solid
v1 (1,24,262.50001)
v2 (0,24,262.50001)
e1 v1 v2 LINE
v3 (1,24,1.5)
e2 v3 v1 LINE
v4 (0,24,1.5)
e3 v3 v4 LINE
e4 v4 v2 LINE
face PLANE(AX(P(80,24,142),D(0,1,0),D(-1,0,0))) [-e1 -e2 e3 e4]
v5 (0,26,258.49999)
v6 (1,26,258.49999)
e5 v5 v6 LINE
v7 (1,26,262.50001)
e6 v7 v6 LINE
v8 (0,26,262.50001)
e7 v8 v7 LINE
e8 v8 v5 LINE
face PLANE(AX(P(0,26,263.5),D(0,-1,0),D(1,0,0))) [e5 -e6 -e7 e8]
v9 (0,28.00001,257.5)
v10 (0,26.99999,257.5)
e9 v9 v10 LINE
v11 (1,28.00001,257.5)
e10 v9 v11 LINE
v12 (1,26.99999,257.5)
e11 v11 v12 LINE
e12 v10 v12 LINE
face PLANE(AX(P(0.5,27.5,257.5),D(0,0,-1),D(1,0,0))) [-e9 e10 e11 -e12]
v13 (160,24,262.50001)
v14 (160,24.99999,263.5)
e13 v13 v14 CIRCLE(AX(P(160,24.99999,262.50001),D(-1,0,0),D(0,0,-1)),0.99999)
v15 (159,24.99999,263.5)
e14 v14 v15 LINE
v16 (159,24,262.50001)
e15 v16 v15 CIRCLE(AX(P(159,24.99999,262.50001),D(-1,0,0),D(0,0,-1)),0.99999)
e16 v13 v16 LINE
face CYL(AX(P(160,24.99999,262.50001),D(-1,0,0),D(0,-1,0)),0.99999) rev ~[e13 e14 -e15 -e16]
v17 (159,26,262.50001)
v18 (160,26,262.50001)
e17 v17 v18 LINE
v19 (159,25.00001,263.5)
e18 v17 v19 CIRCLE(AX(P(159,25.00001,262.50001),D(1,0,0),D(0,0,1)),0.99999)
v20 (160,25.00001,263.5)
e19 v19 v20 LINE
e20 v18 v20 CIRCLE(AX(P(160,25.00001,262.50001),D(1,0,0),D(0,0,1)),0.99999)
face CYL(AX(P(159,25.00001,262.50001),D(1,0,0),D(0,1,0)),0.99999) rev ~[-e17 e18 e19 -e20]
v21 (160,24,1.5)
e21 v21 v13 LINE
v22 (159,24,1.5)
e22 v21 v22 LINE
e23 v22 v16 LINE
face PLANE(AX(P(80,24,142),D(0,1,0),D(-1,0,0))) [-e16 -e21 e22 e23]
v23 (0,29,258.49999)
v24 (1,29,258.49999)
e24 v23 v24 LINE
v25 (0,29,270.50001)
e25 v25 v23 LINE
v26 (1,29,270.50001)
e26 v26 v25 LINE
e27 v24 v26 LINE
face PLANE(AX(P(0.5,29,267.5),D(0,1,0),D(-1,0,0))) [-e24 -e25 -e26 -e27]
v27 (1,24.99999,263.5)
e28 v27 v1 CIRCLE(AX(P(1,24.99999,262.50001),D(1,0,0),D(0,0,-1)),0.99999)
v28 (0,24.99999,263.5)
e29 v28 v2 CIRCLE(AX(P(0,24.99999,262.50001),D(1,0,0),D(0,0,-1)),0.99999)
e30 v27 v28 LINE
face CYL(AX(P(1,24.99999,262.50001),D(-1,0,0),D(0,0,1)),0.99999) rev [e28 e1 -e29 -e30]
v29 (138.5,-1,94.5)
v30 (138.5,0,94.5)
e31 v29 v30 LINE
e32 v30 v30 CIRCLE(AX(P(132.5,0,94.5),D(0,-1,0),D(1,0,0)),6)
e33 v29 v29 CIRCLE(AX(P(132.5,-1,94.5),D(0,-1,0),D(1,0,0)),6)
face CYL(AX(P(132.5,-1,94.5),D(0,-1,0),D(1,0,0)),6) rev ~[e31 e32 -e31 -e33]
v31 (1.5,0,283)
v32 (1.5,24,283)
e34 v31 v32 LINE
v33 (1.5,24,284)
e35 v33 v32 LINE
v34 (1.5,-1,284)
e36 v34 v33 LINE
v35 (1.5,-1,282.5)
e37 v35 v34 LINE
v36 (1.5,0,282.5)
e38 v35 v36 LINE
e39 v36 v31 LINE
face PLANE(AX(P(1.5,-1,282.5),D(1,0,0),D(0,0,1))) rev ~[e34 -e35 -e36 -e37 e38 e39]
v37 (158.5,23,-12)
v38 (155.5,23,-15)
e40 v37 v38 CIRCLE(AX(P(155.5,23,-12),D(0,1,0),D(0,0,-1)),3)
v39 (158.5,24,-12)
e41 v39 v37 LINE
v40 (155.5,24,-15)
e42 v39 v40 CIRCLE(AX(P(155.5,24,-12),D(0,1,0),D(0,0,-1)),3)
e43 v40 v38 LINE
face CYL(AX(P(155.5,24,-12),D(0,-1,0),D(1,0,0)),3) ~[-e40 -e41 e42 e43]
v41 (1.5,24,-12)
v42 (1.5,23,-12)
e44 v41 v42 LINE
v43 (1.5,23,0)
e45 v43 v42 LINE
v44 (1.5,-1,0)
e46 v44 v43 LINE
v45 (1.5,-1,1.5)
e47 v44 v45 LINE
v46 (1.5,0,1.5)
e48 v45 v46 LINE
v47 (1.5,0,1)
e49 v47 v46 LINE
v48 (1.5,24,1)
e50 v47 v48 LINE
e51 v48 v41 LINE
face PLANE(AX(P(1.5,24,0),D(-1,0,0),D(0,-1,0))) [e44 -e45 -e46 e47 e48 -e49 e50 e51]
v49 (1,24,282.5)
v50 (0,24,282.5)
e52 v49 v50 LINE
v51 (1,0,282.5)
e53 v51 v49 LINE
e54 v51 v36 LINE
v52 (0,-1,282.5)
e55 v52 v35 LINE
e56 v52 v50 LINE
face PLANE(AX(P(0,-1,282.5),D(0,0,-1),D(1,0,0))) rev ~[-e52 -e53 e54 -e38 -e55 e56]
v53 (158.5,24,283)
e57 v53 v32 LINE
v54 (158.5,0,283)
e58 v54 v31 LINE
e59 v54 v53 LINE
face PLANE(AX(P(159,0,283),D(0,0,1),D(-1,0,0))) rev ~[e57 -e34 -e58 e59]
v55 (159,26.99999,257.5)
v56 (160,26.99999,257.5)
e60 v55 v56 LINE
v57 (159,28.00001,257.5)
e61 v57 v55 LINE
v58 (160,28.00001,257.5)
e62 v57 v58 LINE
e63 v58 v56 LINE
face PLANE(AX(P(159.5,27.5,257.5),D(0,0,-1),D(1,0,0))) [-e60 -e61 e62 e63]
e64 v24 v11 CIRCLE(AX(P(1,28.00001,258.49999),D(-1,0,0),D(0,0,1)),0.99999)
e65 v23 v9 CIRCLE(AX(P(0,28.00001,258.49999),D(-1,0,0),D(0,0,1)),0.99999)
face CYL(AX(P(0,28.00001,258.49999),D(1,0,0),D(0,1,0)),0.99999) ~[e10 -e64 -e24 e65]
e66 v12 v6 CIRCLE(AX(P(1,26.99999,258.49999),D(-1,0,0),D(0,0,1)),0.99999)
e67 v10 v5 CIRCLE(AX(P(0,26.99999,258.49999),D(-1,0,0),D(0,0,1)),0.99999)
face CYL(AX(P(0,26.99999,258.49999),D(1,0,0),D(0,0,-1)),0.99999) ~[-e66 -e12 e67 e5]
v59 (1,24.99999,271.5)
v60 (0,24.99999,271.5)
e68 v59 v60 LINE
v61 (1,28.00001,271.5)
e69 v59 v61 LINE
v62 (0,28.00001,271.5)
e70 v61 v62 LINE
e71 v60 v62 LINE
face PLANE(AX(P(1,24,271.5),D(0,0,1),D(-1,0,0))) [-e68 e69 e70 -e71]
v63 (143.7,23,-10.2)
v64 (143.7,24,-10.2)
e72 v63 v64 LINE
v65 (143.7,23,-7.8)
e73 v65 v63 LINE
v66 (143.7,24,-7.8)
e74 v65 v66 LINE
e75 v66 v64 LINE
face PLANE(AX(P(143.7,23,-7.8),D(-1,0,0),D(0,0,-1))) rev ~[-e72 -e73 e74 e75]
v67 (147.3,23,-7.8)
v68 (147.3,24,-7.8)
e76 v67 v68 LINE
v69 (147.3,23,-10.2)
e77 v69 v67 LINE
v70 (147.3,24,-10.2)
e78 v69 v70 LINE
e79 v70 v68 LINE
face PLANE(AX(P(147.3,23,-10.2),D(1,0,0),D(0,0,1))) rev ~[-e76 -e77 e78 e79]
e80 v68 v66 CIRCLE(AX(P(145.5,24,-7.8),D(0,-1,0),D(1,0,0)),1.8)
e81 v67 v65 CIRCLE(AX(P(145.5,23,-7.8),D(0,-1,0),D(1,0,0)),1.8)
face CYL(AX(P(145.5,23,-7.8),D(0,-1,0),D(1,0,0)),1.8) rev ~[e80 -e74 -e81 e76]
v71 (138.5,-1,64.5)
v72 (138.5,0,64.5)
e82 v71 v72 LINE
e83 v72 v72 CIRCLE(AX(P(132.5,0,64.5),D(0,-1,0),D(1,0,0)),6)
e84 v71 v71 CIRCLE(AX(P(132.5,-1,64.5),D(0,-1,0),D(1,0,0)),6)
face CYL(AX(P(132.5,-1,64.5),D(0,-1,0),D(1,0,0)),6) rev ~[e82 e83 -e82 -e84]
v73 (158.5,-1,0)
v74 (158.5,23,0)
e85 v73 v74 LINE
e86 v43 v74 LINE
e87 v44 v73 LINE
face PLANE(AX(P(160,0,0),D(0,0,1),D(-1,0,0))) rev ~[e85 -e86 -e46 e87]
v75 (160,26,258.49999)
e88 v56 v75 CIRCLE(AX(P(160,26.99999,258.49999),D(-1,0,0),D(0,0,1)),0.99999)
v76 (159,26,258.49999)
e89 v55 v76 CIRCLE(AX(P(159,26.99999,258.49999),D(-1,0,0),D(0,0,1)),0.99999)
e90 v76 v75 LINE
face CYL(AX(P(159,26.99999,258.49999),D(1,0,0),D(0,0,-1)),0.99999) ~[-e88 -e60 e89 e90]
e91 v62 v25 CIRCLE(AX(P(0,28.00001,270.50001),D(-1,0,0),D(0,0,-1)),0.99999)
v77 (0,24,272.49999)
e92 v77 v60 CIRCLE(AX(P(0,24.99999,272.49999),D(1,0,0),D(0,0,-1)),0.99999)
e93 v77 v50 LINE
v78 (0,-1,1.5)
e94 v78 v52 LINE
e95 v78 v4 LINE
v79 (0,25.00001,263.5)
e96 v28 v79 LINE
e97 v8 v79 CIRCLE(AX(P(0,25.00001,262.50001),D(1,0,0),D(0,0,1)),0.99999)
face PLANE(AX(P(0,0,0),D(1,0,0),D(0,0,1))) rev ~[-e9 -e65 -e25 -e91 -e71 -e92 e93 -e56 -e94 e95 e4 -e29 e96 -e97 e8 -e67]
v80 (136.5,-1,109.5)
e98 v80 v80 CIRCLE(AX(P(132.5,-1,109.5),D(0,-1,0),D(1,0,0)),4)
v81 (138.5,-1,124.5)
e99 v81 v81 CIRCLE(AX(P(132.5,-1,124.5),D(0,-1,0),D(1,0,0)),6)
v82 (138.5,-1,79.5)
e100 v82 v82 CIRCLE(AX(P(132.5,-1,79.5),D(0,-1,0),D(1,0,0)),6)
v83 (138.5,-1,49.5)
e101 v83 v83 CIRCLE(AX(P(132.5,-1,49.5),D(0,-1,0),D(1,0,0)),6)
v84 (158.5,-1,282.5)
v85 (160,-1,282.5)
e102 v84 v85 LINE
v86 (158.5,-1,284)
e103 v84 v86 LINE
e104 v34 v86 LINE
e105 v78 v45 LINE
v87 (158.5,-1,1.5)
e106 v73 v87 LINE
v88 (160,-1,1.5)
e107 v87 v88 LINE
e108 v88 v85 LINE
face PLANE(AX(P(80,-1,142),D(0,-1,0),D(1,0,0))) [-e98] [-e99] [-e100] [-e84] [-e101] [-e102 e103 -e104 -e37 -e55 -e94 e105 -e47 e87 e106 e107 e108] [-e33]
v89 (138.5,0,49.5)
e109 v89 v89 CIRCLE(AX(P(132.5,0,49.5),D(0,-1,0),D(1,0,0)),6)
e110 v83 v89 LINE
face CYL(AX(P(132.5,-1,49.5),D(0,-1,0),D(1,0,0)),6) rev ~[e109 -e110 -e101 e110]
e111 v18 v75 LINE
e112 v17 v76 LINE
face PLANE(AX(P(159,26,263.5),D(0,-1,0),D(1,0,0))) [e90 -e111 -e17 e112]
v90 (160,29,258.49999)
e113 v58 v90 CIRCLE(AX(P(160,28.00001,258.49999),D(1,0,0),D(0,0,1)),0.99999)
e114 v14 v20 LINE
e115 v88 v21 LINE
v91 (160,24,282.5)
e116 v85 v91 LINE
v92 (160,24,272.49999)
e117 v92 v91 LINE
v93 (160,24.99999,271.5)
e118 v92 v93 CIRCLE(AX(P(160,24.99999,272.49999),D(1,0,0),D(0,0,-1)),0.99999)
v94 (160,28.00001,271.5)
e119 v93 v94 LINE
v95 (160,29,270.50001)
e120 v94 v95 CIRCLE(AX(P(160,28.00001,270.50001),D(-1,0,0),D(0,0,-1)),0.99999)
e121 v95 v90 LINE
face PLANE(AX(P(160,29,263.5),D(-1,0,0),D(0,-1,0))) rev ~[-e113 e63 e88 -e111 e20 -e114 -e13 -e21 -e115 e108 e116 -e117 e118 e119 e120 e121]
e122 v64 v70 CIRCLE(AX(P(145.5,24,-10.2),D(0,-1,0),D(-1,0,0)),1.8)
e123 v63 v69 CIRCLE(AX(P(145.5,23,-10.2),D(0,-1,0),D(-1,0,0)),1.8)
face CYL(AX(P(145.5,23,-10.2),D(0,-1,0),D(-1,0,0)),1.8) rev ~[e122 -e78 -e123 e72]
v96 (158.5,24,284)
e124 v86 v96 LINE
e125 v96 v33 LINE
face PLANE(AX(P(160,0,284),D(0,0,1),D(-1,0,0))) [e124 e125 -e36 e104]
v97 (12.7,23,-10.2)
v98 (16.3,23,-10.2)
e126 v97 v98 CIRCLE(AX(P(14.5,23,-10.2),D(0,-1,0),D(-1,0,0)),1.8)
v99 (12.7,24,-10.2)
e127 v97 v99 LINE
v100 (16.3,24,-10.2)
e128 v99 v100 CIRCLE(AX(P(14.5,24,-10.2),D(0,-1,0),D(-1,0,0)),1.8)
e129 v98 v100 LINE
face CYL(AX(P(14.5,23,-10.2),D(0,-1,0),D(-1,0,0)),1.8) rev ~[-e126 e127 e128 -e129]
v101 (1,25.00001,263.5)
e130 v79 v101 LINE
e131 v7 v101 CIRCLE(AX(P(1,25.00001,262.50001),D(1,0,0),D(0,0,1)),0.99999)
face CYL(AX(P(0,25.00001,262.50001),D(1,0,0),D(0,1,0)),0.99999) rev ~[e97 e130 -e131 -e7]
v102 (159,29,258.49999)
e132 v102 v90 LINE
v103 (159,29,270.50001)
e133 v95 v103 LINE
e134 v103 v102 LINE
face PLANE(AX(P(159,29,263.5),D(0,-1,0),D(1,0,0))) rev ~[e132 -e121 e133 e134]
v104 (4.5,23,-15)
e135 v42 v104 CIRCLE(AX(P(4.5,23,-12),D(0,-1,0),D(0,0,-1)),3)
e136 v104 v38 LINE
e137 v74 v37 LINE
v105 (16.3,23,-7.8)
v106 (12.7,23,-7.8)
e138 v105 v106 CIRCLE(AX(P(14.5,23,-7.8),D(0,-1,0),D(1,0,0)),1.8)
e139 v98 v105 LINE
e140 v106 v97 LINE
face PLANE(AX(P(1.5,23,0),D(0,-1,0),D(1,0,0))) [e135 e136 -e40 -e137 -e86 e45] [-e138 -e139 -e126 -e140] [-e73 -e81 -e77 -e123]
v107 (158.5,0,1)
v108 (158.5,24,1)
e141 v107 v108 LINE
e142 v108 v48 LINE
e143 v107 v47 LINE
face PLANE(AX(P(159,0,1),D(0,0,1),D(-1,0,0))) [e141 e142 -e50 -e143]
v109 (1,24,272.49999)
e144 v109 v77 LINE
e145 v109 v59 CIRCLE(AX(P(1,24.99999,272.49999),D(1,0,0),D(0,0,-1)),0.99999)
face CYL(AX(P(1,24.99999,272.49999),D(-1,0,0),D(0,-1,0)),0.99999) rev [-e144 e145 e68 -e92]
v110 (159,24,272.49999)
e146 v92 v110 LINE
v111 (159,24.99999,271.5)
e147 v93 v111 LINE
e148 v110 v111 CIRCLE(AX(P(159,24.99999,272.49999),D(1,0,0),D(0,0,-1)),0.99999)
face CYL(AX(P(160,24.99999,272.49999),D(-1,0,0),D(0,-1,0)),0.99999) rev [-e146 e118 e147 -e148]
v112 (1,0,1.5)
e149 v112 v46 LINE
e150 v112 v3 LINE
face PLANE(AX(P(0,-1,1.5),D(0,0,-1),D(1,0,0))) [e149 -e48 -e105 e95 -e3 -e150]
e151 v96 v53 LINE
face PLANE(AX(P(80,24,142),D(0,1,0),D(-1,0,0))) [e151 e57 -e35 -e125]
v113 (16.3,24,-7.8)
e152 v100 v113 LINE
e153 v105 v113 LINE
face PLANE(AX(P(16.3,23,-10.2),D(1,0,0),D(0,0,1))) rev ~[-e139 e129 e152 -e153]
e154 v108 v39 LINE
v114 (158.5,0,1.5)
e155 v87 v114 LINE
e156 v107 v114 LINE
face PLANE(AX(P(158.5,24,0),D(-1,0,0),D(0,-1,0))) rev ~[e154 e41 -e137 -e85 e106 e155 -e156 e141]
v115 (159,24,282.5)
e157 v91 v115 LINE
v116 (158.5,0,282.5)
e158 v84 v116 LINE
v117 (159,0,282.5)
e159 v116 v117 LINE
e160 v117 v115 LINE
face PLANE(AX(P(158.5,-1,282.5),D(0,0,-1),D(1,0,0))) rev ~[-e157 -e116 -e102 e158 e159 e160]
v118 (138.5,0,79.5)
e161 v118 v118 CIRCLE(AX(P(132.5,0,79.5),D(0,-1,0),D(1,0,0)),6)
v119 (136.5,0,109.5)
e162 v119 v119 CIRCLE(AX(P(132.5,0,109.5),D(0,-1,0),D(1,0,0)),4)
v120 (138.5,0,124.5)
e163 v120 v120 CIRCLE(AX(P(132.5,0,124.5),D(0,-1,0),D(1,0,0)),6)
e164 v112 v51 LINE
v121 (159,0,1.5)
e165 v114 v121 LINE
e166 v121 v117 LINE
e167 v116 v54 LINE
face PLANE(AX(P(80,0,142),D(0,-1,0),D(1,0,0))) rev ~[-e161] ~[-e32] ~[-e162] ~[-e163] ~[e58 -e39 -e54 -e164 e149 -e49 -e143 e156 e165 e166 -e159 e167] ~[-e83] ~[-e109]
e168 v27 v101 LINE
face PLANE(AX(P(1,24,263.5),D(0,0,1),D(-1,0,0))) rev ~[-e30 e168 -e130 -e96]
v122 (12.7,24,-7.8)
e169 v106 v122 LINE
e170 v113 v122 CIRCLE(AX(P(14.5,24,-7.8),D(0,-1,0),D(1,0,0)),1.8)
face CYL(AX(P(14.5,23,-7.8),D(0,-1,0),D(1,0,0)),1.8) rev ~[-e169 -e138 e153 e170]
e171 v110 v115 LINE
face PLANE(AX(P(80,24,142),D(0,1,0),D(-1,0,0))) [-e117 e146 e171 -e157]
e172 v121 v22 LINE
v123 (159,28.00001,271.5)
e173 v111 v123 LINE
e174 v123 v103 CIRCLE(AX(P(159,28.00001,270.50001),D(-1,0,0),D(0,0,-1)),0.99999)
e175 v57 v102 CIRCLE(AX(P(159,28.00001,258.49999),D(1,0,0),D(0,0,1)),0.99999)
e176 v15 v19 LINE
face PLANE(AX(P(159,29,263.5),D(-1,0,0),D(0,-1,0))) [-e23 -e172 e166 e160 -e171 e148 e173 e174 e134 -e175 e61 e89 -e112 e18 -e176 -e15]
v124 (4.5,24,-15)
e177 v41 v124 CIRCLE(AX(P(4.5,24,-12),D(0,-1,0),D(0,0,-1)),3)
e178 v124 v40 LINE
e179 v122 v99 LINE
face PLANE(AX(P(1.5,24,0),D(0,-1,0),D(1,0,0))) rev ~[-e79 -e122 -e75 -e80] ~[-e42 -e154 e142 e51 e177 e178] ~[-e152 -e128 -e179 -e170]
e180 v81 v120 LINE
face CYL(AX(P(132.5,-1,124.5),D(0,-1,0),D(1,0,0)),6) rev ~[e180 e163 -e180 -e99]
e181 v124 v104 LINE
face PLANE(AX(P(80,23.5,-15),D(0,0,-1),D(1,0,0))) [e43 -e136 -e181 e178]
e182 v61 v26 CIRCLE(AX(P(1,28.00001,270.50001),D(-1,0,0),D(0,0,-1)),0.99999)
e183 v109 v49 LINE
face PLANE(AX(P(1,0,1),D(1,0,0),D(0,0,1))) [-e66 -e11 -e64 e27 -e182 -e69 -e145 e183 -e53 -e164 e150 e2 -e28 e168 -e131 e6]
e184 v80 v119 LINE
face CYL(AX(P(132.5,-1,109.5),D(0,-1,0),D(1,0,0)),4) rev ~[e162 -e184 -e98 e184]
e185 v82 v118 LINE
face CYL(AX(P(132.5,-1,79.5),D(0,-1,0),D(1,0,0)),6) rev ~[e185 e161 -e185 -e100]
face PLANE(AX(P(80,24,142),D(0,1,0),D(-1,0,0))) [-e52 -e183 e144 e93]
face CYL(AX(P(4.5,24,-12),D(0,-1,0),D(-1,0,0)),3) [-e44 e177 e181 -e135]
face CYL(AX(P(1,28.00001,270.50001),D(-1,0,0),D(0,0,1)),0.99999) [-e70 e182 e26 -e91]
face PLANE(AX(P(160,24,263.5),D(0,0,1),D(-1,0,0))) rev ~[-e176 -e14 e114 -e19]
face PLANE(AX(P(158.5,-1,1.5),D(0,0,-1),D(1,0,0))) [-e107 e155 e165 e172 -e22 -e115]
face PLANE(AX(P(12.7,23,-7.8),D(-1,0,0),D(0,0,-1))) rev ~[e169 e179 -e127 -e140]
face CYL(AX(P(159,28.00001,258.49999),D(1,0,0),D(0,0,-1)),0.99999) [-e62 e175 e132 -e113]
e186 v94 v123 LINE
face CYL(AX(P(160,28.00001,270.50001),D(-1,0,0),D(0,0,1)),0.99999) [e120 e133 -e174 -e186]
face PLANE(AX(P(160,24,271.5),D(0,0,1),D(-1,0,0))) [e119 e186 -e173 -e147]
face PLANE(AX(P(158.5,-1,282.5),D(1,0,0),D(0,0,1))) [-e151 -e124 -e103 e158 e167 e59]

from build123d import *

# Parameters (mm, degrees)
F0_W      = 160
F0_H      = 284
F1_DEPTH  = 1
F2_W      = 160
F2_H      = 284
F2_W_2    = 158
F2_H_2    = 282
F3_DEPTH  = 24
F4_W      = 1.5
F4_H      = 1.5
F5_DEPTH  = 25.001
F6_R      = 6
F6_R_2    = 4
F7_DEPTH  = 25.001
F8_W      = 157
F8_H      = 1
F9_DEPTH  = 15
F10_R     = 3
F12_DEPTH = 1.001
F13_W     = 1
F13_H     = 8
F14_DEPTH = 5
F15_W     = 1
F15_H     = 3
F16_DEPTH = 6
F17_R     = 0.99999
F18_R     = 0.99999


# Not quite as in the source:
# - a fillet or chamfer is up to 0.001 mm smaller than in the source, because OpenCascade refuses the exact size


with BuildPart() as f1:
    # F0 (on Front) → F1 (new body)
    with BuildSketch(Plane.XZ):
        with Locations((80, 142)):
            Rectangle(F0_W, F0_H)
    extrude(amount=F1_DEPTH)

    # F2 (on face) → F3 (join)
    with BuildSketch(Plane(origin=(0, 0, 0), x_dir=(-1, 0, 0), z_dir=(0, 1, 0))):
        with Locations((-80, 142)):
            Rectangle(F2_W, F2_H)
        with Locations((-80, 142)):
            Rectangle(F2_W_2, F2_H_2, mode=Mode.SUBTRACT)
    extrude(amount=F3_DEPTH)

    # F4 (on face) → F5 (cut, through all)
    with BuildSketch(Plane.XZ.offset(1)):
        with Locations((0.75, 283.25)):
            Rectangle(F4_W, F4_H)
        with Locations((159.25, 283.25)):
            Rectangle(F4_W, F4_H)
        with Locations((159.25, 0.75)):
            Rectangle(F4_W, F4_H)
        with Locations((0.75, 0.75)):
            Rectangle(F4_W, F4_H)
    extrude(amount=-F5_DEPTH, mode=Mode.SUBTRACT)

    # F6 (on face) → F7 (cut, through all)
    with BuildSketch(Plane.XZ.offset(1)):
        with Locations((132.5, 124.5)):
            Circle(F6_R)
        with Locations((132.5, 109.5)):
            Circle(F6_R_2)
        with Locations((132.5, 94.5)):
            Circle(F6_R)
        with Locations((132.5, 79.5)):
            Circle(F6_R)
        with Locations((132.5, 64.5)):
            Circle(F6_R)
        with Locations((132.5, 49.5)):
            Circle(F6_R)
    extrude(amount=-F7_DEPTH, mode=Mode.SUBTRACT)

    # F8 (on face) → F9 (join)
    with BuildSketch(Plane(origin=(0, 0, 0), x_dir=(1, 0, 0), z_dir=(0, 0, -1))):
        with Locations((80, -23.5)):
            Rectangle(F8_W, F8_H)
    extrude(amount=F9_DEPTH)

    # F10
    f10_edges = [f1.edges().sort_by_distance(p)[0] for p in [
        (1.5, 23.5, -15),
        (158.5, 23.5, -15),
    ]]
    fillet(f10_edges, radius=F10_R)

    # F11 (on face) → F12 (cut, through all)
    with BuildSketch(Plane.XZ.offset(-23)):
        with BuildLine():
            ThreePointArc((16.3, -7.8), (14.5, -6), (12.7, -7.8))
            Line((12.7, -7.8), (12.7, -10.2))
            ThreePointArc((12.7, -10.2), (14.5, -12), (16.3, -10.2))
            Line((16.3, -10.2), (16.3, -7.8))
        make_face()
        with BuildLine():
            ThreePointArc((147.3, -7.8), (145.5, -6), (143.7, -7.8))
            Line((143.7, -7.8), (143.7, -10.2))
            ThreePointArc((143.7, -10.2), (145.5, -12), (147.3, -10.2))
            Line((147.3, -10.2), (147.3, -7.8))
        make_face()
    extrude(amount=-F12_DEPTH, mode=Mode.SUBTRACT)

    # F13 (on face) → F14 (join)
    with BuildSketch(Plane(origin=(0, 24, 0), x_dir=(-1, 0, 0), z_dir=(0, 1, 0))):
        with Locations((-159.5, 267.5)):
            Rectangle(F13_W, F13_H)
        with Locations((-0.5, 267.5)):
            Rectangle(F13_W, F13_H)
    extrude(amount=F14_DEPTH)

    # F15 (on face) → F16 (join)
    with BuildSketch(Plane(origin=(0, 0, 263.5), x_dir=(1, 0, 0), z_dir=(0, 0, -1))):
        with Locations((159.5, -27.5)):
            Rectangle(F15_W, F15_H)
        with Locations((0.5, -27.5)):
            Rectangle(F15_W, F15_H)
    extrude(amount=F16_DEPTH)

    # F17 (radius 1 in the source; OpenCascade refuses exactly that, so slightly less here)
    f17_edges = [f1.edges().sort_by_distance(p)[0] for p in [
        (0.5, 26, 263.5),
        (0.5, 26, 257.5),
        (0.5, 29, 257.5),
        (0.5, 24, 263.5),
        (0.5, 24, 271.5),
        (0.5, 29, 271.5),
    ]]
    fillet(f17_edges, radius=F17_R)

    # F18 (radius 1 in the source; OpenCascade refuses exactly that, so slightly less here)
    f18_edges = [f1.edges().sort_by_distance(p)[0] for p in [
        (159.5, 24, 271.5),
        (159.5, 29, 271.5),
        (159.5, 29, 257.5),
        (159.5, 24, 263.5),
        (159.5, 26, 257.5),
        (159.5, 26, 263.5),
    ]]
    fillet(f18_edges, radius=F18_R)


solid = f1.part
